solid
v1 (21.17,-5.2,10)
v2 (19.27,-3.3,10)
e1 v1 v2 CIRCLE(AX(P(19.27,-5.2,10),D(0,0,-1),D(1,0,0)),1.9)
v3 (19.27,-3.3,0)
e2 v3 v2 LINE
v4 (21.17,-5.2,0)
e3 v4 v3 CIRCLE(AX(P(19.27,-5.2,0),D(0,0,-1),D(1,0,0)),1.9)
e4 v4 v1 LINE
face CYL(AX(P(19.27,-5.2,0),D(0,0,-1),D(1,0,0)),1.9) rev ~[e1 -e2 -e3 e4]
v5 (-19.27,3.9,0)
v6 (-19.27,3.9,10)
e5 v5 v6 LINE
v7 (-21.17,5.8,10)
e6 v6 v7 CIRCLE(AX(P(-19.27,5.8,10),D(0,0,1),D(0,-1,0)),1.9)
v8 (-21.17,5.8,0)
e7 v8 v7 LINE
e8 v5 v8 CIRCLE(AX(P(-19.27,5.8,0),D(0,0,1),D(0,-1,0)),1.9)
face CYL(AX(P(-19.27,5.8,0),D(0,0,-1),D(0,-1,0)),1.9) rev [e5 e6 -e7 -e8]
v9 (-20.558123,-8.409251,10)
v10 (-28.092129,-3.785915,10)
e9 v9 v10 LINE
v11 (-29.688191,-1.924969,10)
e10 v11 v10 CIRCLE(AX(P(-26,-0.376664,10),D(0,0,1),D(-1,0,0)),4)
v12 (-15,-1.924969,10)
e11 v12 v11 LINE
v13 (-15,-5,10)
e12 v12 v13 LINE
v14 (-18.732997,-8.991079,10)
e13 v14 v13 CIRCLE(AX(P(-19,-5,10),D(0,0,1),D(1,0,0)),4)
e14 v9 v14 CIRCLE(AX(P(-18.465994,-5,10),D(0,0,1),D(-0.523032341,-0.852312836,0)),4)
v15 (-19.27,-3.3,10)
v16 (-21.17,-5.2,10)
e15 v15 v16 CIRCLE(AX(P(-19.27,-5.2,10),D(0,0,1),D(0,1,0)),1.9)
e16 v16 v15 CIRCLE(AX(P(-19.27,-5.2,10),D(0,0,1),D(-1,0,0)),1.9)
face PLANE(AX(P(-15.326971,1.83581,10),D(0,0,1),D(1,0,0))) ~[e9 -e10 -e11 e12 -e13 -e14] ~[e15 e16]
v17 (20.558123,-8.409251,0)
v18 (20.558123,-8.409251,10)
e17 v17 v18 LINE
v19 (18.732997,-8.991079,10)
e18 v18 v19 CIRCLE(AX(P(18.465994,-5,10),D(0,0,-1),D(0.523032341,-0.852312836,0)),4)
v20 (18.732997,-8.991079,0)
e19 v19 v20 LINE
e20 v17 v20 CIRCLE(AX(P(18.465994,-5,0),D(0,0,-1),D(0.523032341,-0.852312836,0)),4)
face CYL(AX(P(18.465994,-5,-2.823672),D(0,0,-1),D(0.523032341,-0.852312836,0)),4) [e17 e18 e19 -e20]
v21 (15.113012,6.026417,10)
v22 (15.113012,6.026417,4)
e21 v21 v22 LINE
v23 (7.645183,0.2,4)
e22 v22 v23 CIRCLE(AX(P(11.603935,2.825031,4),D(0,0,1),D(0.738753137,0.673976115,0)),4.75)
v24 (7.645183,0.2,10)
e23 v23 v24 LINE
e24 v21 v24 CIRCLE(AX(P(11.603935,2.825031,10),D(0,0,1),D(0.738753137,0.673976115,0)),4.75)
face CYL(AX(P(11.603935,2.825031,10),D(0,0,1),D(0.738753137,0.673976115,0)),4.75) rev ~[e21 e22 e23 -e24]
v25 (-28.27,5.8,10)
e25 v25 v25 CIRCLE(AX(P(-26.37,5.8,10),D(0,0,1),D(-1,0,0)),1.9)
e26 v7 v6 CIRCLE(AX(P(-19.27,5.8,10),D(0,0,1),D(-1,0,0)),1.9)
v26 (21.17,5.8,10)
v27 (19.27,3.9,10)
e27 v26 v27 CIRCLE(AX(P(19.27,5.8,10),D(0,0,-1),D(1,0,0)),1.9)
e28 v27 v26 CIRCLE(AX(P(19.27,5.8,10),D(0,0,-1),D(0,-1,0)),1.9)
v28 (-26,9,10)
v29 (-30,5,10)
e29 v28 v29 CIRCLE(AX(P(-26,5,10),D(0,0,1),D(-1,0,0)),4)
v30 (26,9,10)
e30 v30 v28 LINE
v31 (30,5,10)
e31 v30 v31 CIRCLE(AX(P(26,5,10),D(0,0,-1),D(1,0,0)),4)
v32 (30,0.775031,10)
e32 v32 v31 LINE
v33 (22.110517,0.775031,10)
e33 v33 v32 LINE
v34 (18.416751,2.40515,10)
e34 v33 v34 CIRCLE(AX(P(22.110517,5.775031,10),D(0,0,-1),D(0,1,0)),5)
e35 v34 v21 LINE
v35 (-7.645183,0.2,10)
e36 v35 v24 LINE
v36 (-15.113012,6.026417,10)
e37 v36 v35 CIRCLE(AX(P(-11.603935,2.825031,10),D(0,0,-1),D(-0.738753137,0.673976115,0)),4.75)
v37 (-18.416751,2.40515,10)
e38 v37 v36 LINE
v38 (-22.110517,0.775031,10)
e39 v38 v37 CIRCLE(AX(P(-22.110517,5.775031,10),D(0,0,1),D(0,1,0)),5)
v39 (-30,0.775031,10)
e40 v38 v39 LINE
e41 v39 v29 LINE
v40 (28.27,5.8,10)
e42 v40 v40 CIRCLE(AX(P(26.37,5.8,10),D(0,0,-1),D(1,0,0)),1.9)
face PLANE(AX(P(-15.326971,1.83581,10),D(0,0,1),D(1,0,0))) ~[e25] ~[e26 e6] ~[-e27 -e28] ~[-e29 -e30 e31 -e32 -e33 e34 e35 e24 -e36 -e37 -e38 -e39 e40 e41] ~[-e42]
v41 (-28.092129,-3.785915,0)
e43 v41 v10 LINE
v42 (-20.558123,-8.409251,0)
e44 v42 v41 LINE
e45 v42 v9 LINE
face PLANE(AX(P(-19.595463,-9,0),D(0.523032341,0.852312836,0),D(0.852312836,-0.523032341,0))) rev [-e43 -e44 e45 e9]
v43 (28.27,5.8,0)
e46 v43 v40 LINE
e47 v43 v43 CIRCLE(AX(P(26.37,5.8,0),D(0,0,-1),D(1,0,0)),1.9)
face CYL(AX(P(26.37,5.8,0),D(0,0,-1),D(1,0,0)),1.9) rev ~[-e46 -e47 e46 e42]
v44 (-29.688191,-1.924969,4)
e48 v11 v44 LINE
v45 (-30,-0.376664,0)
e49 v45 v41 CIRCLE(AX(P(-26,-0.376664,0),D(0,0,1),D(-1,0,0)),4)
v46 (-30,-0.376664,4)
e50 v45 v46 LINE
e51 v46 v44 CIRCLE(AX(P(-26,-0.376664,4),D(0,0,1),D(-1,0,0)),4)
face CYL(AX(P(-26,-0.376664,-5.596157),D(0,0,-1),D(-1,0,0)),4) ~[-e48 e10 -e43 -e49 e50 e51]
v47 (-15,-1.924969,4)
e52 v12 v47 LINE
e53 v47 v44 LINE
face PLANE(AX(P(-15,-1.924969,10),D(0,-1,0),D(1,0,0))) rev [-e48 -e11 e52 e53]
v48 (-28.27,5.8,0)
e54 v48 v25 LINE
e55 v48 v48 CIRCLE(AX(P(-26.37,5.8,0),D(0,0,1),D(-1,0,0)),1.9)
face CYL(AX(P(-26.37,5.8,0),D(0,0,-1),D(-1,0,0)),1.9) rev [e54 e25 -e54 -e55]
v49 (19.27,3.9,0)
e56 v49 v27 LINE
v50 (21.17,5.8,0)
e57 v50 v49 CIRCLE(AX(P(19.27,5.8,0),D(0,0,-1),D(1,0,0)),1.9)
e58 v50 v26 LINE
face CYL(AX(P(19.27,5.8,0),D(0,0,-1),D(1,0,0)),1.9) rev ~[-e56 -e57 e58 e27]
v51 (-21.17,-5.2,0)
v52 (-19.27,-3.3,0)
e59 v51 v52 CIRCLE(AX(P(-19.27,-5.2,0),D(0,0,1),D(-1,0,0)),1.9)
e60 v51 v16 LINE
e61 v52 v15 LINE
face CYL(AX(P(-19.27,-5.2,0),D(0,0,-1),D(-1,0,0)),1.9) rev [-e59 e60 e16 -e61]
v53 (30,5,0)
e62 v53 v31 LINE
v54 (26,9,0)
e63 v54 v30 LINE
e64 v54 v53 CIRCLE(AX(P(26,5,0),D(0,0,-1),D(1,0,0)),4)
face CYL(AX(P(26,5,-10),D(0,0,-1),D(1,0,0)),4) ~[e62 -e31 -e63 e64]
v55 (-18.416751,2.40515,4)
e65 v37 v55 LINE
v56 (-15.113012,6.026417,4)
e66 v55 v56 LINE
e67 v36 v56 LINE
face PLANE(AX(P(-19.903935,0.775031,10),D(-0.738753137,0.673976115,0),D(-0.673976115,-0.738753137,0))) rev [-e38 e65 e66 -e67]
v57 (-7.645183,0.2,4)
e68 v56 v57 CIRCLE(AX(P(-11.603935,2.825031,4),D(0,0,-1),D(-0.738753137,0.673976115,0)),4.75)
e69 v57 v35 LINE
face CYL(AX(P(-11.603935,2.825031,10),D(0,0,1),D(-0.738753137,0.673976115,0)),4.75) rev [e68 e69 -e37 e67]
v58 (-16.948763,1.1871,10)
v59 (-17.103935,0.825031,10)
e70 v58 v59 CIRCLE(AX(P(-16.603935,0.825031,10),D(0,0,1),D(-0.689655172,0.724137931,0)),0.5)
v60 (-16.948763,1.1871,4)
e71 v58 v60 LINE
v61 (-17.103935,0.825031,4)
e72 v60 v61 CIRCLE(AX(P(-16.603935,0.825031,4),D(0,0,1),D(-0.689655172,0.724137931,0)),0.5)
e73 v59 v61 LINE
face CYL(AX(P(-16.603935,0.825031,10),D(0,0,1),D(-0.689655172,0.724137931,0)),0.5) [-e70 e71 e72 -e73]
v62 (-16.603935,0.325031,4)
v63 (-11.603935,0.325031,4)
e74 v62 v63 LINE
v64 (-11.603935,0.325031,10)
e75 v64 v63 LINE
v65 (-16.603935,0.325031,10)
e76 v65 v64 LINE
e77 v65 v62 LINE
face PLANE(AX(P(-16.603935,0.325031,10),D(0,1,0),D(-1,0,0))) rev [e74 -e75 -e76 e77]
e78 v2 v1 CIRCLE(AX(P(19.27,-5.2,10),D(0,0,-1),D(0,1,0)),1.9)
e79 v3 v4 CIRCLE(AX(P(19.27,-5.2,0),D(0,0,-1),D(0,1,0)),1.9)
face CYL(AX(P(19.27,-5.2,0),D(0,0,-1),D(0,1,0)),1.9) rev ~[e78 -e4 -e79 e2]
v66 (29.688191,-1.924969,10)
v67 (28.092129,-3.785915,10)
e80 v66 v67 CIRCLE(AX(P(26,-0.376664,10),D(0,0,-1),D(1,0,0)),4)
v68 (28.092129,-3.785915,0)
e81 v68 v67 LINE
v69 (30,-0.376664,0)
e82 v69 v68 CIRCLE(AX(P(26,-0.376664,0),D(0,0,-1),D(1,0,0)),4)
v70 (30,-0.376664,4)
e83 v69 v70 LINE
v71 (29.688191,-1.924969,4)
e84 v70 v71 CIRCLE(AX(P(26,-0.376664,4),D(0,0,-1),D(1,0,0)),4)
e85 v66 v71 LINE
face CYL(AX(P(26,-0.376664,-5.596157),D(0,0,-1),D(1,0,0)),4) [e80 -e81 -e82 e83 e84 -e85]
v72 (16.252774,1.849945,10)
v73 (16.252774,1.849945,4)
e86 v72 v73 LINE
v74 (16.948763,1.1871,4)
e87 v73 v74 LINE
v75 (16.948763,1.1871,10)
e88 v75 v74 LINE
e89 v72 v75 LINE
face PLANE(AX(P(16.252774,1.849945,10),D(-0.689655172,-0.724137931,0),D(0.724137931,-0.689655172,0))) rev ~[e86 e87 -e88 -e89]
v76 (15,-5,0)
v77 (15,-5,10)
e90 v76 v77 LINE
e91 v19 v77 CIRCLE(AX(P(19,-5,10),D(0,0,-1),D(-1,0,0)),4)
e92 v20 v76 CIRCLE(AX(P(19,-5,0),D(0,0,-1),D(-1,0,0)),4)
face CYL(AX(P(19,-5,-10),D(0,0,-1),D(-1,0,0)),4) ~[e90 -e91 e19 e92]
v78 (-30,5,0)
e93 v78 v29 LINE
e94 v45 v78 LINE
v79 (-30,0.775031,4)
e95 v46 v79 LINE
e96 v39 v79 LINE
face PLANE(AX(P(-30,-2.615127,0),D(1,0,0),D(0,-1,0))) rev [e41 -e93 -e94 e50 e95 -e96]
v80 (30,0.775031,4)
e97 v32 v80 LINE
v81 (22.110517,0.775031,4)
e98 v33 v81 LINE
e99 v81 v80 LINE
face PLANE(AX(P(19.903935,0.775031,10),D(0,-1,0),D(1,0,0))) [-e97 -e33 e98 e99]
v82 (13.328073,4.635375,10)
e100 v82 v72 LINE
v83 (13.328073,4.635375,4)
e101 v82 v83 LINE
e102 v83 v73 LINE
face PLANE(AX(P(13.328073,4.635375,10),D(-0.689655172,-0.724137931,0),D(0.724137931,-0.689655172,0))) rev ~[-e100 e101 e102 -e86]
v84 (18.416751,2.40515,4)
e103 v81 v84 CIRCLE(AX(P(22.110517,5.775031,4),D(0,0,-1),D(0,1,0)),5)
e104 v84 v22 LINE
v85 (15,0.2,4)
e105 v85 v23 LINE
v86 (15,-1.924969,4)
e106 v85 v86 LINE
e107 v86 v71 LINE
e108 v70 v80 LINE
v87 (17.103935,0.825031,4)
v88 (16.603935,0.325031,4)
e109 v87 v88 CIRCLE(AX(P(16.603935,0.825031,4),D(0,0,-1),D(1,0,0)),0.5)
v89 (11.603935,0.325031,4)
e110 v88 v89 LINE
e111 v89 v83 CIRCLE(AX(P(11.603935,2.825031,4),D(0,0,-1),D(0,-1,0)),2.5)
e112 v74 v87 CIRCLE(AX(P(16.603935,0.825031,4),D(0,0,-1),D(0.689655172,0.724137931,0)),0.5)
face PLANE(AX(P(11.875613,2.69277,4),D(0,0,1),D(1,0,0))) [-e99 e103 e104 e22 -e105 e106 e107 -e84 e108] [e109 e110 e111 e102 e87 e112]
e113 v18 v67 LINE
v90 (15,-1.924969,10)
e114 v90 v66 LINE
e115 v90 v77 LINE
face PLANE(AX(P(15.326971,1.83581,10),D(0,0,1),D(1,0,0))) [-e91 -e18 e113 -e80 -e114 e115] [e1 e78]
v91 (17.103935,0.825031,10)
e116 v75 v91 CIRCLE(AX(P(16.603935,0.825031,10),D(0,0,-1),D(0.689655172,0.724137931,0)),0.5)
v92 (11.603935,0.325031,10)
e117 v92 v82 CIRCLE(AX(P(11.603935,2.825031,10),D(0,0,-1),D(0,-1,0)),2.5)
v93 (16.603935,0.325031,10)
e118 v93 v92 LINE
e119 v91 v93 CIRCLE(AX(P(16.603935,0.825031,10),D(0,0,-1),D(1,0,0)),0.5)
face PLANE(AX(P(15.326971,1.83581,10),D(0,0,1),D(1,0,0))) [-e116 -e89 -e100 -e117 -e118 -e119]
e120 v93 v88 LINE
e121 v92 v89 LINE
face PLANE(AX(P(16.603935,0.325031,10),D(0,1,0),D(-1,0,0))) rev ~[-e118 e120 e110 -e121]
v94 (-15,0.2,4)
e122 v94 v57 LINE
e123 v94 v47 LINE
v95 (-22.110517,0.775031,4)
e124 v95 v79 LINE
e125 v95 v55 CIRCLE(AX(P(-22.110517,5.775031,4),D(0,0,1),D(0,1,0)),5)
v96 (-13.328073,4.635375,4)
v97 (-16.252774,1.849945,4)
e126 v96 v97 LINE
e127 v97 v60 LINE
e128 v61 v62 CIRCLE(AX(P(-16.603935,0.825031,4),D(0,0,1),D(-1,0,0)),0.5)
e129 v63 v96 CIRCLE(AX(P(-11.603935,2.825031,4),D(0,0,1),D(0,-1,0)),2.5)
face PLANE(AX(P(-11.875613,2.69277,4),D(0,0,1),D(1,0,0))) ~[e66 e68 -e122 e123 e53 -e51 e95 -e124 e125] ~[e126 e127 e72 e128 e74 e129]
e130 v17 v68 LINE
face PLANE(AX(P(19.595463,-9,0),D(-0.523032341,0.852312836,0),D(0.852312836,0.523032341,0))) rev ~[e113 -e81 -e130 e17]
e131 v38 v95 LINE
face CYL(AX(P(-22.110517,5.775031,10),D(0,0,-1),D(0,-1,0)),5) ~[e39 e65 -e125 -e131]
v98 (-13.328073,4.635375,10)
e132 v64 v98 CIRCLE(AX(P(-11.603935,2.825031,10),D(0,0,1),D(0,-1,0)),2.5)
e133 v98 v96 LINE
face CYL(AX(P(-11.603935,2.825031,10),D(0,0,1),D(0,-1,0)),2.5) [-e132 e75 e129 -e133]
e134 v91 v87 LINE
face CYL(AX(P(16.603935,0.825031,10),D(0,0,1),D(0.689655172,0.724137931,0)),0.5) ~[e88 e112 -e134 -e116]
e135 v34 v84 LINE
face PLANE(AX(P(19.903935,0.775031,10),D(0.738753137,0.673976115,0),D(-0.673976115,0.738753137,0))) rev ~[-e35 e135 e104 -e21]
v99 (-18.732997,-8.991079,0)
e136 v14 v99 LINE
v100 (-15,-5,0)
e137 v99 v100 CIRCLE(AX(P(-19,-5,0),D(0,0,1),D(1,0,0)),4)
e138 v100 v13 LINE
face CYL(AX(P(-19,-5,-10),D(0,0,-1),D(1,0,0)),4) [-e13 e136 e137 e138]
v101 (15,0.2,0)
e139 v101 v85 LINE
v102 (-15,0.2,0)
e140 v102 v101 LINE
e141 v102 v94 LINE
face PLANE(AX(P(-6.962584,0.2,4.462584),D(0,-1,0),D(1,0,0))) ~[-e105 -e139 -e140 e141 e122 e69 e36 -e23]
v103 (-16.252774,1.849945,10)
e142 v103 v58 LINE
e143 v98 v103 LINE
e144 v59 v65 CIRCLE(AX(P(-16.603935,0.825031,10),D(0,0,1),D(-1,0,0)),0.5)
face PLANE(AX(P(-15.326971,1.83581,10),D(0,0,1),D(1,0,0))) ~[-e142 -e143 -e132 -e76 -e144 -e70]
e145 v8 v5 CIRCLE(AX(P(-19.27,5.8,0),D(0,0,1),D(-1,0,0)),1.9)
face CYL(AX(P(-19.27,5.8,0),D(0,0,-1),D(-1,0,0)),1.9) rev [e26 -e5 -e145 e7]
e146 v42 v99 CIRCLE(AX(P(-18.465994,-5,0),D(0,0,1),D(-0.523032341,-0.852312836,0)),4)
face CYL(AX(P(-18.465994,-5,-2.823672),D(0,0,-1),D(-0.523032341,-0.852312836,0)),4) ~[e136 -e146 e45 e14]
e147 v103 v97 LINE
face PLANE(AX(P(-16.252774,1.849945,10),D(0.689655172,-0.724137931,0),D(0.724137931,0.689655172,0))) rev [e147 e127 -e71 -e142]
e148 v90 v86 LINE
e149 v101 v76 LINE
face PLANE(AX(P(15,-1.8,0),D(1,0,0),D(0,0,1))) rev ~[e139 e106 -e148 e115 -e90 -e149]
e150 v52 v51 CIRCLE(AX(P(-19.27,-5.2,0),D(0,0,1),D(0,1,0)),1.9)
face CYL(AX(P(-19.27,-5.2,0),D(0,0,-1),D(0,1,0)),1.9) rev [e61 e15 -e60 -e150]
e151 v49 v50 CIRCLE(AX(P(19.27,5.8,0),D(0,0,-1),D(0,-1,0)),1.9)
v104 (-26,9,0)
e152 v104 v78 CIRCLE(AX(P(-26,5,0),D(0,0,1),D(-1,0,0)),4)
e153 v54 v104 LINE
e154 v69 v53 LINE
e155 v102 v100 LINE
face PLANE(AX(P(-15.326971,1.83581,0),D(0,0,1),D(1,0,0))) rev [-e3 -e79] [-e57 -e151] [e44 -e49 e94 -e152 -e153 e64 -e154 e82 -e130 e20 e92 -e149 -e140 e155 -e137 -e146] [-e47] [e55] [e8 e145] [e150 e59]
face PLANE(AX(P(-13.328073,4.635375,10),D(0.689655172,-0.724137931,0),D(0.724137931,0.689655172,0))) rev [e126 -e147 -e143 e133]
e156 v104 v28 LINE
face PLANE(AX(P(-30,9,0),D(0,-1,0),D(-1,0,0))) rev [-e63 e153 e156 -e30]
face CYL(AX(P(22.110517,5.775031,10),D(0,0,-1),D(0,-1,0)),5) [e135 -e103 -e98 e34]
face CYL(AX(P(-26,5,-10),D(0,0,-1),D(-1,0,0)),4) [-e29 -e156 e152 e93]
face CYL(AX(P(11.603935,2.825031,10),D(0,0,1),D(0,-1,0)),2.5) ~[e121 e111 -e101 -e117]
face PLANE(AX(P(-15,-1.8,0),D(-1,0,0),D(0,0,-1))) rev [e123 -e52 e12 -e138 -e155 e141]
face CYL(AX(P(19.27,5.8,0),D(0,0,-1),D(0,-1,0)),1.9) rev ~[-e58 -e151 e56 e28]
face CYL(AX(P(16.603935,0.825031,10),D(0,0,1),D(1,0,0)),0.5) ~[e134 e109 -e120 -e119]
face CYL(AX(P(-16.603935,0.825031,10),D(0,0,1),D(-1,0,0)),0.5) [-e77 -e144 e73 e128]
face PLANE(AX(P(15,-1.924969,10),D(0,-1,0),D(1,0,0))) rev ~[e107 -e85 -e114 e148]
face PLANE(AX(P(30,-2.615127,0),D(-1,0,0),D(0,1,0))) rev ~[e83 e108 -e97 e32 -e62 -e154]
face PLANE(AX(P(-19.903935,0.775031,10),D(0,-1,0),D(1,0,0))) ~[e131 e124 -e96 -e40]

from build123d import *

# Parameters (mm, degrees)
F1_DEPTH    = 10
F2_W        = 10.0960650777
F2_H        = 2.7
F3_DEPTH    = 6
F4_R        = 5
F5_T1_DEPTH = 21.1923143391
F5_T3_DEPTH = 15.6473434867
F5_T5_DEPTH = 30
F7_DEPTH    = 2


# Not quite as in the source:
# - a fillet or chamfer that OpenCascade refuses, or shapes differently, is made with other operations: its cross-section is extruded or revolved along the edge and cut away or added


with BuildPart() as f1:
    # F0 (on Top) → F1 (new body)
    with BuildSketch(Plane.XY):
        Polygon((30, 9), (0, 9), (0, -1.8), (15, -1.8), (15, -9), (19.5954625243, -9), (30, -2.6151265483), align=None)
        with BuildLine():
            ThreePointArc((21.17, -5.2), (17.9264971157, -6.5435028843), (19.27, -3.3))
            ThreePointArc((19.27, -3.3), (20.6135028843, -3.8564971157), (21.17, -5.2))
        make_face(mode=Mode.SUBTRACT)
        with BuildLine():
            ThreePointArc((19.27, 3.9), (17.9264971157, 7.1435028843), (21.17, 5.8))
            ThreePointArc((21.17, 5.8), (20.6135028843, 4.4564971157), (19.27, 3.9))
        make_face(mode=Mode.SUBTRACT)
        with BuildLine():
            ThreePointArc((24.47, 5.8), (26.37, 7.7), (28.27, 5.8))
            ThreePointArc((28.27, 5.8), (26.37, 3.9), (24.47, 5.8))
        make_face(mode=Mode.SUBTRACT)
    extrude(amount=F1_DEPTH)

    # F2 (on face) → F3 (cut)
    with BuildSketch(Plane.XY.offset(10)):
        with BuildLine():
            ThreePointArc((11.6039349223, 0.3250306588), (9.2827431951, 3.7535073497), (13.3280728534, 4.6353754864))
            Line((13.3280728534, 4.6353754864), (16.2527744297, 1.8499454137))
            ThreePointArc((16.2527744297, 1.8499454137), (16.328577113, 2.3348713274), (16.3539349223, 2.8250306588))
            ThreePointArc((16.3539349223, 2.8250306588), (16.0328522645, 4.5417691876), (15.1130123218, 6.0264172029))
            ThreePointArc((15.1130123218, 6.0264172029), (7.5069370658, 5.2285923001), (10.5215341623, -1.8))
            Line((10.5215341623, -1.8), (12.6863356823, -1.8))
            ThreePointArc((12.6863356823, -1.8), (14.376262754, -1.0320016711), (15.6428085277, 0.3250306588))
            Line((15.6428085277, 0.3250306588), (11.6039349223, 0.3250306588))
        make_face()
        with BuildLine():
            ThreePointArc((16.3539349223, 2.8250306588), (16.328577113, 2.3348713274), (16.2527744297, 1.8499454137))
            Line((16.2527744297, 1.8499454137), (16.9487625085, 1.1870996243))
            ThreePointArc((16.9487625085, 1.1870996243), (17.0635074373, 1.0219903081), (17.1039349223, 0.8250306588))
            ThreePointArc((17.1039349223, 0.8250306588), (16.9574883129, 0.4714772682), (16.6039349223, 0.3250306588))
            Line((16.6039349223, 0.3250306588), (15.6428085277, 0.3250306588))
            ThreePointArc((15.6428085277, 0.3250306588), (14.376262754, -1.0320016711), (12.6863356823, -1.8))
            Line((12.6863356823, -1.8), (15, -1.8))
            Line((15, -1.8), (15, -1.9249693412))
            Line((15, -1.9249693412), (19.9039349223, -1.9249693412))
            Line((19.9039349223, -1.9249693412), (19.9039349223, 0.7750306588))
            Line((19.9039349223, 0.7750306588), (15.1130123218, 6.0264172029))
            ThreePointArc((15.1130123218, 6.0264172029), (16.0328522645, 4.5417691876), (16.3539349223, 2.8250306588))
        make_face()
        with Locations((24.9519674612, -0.5749693412)):
            Rectangle(F2_W, F2_H)
    extrude(amount=-F3_DEPTH, mode=Mode.SUBTRACT)

    # F4
    f4_edges = [f1.edges().sort_by_distance(p)[0] for p in [
        (19.903935, 0.775031, 7),
    ]]
    fillet(f4_edges, radius=F4_R)

    # F5: fillet of radius 4 on 4 edges, made by hand

    # F5_s2 → F5_t1 (cut)
    with BuildSketch(Plane.XY.offset(-5.5961571696)):
        with BuildLine():
            ThreePointArc((30, -0.3766636805), (29.4905957559, -2.3300559271), (28.0921293656, -3.7859150232))
            Line((28.0921293656, -3.7859150232), (30, -2.6151265483))
            Line((30, -2.6151265483), (30, -0.3766636805))
        make_face()
    extrude(amount=F5_T1_DEPTH, mode=Mode.SUBTRACT)

    # F5_s4 → F5_t3 (cut)
    with BuildSketch(Plane.XY.offset(-2.8236717433)):
        with BuildLine():
            ThreePointArc((20.5581231925, -8.4092513427), (19.5529608525, -8.8494808332), (18.465993827, -9))
            Line((18.465993827, -9), (19.5954625243, -9))
            Line((19.5954625243, -9), (20.5581231925, -8.4092513427))
        make_face()
    extrude(amount=F5_T3_DEPTH, mode=Mode.SUBTRACT)

    # F5_s6 → F5_t5 (cut)
    with BuildSketch(Plane.XY.offset(-10)):
        with BuildLine():
            ThreePointArc((15, -5), (16.1715728753, -7.8284271247), (19, -9))
            Line((19, -9), (15, -9))
            Line((15, -9), (15, -5))
        make_face()
        with BuildLine():
            ThreePointArc((30, 5), (28.8284271247, 7.8284271247), (26, 9))
            Line((26, 9), (30, 9))
            Line((30, 9), (30, 5))
        make_face()
    extrude(amount=F5_T5_DEPTH, mode=Mode.SUBTRACT)

    # F6 (on face) → F7 (cut)
    with BuildSketch(Plane.XZ.offset(1.8)):
        Polygon((0, 10), (0, 0), (15, 0), (15, 4), (10.5215341623, 4), (10.5215341623, 10), align=None)
    extrude(amount=-F7_DEPTH, mode=Mode.SUBTRACT)

    # F8: F1 across plane


with BuildPart() as f1_1:
    add(f1.part)
    add(f1.part.mirror(Plane.YZ))


solid = f1_1.part
